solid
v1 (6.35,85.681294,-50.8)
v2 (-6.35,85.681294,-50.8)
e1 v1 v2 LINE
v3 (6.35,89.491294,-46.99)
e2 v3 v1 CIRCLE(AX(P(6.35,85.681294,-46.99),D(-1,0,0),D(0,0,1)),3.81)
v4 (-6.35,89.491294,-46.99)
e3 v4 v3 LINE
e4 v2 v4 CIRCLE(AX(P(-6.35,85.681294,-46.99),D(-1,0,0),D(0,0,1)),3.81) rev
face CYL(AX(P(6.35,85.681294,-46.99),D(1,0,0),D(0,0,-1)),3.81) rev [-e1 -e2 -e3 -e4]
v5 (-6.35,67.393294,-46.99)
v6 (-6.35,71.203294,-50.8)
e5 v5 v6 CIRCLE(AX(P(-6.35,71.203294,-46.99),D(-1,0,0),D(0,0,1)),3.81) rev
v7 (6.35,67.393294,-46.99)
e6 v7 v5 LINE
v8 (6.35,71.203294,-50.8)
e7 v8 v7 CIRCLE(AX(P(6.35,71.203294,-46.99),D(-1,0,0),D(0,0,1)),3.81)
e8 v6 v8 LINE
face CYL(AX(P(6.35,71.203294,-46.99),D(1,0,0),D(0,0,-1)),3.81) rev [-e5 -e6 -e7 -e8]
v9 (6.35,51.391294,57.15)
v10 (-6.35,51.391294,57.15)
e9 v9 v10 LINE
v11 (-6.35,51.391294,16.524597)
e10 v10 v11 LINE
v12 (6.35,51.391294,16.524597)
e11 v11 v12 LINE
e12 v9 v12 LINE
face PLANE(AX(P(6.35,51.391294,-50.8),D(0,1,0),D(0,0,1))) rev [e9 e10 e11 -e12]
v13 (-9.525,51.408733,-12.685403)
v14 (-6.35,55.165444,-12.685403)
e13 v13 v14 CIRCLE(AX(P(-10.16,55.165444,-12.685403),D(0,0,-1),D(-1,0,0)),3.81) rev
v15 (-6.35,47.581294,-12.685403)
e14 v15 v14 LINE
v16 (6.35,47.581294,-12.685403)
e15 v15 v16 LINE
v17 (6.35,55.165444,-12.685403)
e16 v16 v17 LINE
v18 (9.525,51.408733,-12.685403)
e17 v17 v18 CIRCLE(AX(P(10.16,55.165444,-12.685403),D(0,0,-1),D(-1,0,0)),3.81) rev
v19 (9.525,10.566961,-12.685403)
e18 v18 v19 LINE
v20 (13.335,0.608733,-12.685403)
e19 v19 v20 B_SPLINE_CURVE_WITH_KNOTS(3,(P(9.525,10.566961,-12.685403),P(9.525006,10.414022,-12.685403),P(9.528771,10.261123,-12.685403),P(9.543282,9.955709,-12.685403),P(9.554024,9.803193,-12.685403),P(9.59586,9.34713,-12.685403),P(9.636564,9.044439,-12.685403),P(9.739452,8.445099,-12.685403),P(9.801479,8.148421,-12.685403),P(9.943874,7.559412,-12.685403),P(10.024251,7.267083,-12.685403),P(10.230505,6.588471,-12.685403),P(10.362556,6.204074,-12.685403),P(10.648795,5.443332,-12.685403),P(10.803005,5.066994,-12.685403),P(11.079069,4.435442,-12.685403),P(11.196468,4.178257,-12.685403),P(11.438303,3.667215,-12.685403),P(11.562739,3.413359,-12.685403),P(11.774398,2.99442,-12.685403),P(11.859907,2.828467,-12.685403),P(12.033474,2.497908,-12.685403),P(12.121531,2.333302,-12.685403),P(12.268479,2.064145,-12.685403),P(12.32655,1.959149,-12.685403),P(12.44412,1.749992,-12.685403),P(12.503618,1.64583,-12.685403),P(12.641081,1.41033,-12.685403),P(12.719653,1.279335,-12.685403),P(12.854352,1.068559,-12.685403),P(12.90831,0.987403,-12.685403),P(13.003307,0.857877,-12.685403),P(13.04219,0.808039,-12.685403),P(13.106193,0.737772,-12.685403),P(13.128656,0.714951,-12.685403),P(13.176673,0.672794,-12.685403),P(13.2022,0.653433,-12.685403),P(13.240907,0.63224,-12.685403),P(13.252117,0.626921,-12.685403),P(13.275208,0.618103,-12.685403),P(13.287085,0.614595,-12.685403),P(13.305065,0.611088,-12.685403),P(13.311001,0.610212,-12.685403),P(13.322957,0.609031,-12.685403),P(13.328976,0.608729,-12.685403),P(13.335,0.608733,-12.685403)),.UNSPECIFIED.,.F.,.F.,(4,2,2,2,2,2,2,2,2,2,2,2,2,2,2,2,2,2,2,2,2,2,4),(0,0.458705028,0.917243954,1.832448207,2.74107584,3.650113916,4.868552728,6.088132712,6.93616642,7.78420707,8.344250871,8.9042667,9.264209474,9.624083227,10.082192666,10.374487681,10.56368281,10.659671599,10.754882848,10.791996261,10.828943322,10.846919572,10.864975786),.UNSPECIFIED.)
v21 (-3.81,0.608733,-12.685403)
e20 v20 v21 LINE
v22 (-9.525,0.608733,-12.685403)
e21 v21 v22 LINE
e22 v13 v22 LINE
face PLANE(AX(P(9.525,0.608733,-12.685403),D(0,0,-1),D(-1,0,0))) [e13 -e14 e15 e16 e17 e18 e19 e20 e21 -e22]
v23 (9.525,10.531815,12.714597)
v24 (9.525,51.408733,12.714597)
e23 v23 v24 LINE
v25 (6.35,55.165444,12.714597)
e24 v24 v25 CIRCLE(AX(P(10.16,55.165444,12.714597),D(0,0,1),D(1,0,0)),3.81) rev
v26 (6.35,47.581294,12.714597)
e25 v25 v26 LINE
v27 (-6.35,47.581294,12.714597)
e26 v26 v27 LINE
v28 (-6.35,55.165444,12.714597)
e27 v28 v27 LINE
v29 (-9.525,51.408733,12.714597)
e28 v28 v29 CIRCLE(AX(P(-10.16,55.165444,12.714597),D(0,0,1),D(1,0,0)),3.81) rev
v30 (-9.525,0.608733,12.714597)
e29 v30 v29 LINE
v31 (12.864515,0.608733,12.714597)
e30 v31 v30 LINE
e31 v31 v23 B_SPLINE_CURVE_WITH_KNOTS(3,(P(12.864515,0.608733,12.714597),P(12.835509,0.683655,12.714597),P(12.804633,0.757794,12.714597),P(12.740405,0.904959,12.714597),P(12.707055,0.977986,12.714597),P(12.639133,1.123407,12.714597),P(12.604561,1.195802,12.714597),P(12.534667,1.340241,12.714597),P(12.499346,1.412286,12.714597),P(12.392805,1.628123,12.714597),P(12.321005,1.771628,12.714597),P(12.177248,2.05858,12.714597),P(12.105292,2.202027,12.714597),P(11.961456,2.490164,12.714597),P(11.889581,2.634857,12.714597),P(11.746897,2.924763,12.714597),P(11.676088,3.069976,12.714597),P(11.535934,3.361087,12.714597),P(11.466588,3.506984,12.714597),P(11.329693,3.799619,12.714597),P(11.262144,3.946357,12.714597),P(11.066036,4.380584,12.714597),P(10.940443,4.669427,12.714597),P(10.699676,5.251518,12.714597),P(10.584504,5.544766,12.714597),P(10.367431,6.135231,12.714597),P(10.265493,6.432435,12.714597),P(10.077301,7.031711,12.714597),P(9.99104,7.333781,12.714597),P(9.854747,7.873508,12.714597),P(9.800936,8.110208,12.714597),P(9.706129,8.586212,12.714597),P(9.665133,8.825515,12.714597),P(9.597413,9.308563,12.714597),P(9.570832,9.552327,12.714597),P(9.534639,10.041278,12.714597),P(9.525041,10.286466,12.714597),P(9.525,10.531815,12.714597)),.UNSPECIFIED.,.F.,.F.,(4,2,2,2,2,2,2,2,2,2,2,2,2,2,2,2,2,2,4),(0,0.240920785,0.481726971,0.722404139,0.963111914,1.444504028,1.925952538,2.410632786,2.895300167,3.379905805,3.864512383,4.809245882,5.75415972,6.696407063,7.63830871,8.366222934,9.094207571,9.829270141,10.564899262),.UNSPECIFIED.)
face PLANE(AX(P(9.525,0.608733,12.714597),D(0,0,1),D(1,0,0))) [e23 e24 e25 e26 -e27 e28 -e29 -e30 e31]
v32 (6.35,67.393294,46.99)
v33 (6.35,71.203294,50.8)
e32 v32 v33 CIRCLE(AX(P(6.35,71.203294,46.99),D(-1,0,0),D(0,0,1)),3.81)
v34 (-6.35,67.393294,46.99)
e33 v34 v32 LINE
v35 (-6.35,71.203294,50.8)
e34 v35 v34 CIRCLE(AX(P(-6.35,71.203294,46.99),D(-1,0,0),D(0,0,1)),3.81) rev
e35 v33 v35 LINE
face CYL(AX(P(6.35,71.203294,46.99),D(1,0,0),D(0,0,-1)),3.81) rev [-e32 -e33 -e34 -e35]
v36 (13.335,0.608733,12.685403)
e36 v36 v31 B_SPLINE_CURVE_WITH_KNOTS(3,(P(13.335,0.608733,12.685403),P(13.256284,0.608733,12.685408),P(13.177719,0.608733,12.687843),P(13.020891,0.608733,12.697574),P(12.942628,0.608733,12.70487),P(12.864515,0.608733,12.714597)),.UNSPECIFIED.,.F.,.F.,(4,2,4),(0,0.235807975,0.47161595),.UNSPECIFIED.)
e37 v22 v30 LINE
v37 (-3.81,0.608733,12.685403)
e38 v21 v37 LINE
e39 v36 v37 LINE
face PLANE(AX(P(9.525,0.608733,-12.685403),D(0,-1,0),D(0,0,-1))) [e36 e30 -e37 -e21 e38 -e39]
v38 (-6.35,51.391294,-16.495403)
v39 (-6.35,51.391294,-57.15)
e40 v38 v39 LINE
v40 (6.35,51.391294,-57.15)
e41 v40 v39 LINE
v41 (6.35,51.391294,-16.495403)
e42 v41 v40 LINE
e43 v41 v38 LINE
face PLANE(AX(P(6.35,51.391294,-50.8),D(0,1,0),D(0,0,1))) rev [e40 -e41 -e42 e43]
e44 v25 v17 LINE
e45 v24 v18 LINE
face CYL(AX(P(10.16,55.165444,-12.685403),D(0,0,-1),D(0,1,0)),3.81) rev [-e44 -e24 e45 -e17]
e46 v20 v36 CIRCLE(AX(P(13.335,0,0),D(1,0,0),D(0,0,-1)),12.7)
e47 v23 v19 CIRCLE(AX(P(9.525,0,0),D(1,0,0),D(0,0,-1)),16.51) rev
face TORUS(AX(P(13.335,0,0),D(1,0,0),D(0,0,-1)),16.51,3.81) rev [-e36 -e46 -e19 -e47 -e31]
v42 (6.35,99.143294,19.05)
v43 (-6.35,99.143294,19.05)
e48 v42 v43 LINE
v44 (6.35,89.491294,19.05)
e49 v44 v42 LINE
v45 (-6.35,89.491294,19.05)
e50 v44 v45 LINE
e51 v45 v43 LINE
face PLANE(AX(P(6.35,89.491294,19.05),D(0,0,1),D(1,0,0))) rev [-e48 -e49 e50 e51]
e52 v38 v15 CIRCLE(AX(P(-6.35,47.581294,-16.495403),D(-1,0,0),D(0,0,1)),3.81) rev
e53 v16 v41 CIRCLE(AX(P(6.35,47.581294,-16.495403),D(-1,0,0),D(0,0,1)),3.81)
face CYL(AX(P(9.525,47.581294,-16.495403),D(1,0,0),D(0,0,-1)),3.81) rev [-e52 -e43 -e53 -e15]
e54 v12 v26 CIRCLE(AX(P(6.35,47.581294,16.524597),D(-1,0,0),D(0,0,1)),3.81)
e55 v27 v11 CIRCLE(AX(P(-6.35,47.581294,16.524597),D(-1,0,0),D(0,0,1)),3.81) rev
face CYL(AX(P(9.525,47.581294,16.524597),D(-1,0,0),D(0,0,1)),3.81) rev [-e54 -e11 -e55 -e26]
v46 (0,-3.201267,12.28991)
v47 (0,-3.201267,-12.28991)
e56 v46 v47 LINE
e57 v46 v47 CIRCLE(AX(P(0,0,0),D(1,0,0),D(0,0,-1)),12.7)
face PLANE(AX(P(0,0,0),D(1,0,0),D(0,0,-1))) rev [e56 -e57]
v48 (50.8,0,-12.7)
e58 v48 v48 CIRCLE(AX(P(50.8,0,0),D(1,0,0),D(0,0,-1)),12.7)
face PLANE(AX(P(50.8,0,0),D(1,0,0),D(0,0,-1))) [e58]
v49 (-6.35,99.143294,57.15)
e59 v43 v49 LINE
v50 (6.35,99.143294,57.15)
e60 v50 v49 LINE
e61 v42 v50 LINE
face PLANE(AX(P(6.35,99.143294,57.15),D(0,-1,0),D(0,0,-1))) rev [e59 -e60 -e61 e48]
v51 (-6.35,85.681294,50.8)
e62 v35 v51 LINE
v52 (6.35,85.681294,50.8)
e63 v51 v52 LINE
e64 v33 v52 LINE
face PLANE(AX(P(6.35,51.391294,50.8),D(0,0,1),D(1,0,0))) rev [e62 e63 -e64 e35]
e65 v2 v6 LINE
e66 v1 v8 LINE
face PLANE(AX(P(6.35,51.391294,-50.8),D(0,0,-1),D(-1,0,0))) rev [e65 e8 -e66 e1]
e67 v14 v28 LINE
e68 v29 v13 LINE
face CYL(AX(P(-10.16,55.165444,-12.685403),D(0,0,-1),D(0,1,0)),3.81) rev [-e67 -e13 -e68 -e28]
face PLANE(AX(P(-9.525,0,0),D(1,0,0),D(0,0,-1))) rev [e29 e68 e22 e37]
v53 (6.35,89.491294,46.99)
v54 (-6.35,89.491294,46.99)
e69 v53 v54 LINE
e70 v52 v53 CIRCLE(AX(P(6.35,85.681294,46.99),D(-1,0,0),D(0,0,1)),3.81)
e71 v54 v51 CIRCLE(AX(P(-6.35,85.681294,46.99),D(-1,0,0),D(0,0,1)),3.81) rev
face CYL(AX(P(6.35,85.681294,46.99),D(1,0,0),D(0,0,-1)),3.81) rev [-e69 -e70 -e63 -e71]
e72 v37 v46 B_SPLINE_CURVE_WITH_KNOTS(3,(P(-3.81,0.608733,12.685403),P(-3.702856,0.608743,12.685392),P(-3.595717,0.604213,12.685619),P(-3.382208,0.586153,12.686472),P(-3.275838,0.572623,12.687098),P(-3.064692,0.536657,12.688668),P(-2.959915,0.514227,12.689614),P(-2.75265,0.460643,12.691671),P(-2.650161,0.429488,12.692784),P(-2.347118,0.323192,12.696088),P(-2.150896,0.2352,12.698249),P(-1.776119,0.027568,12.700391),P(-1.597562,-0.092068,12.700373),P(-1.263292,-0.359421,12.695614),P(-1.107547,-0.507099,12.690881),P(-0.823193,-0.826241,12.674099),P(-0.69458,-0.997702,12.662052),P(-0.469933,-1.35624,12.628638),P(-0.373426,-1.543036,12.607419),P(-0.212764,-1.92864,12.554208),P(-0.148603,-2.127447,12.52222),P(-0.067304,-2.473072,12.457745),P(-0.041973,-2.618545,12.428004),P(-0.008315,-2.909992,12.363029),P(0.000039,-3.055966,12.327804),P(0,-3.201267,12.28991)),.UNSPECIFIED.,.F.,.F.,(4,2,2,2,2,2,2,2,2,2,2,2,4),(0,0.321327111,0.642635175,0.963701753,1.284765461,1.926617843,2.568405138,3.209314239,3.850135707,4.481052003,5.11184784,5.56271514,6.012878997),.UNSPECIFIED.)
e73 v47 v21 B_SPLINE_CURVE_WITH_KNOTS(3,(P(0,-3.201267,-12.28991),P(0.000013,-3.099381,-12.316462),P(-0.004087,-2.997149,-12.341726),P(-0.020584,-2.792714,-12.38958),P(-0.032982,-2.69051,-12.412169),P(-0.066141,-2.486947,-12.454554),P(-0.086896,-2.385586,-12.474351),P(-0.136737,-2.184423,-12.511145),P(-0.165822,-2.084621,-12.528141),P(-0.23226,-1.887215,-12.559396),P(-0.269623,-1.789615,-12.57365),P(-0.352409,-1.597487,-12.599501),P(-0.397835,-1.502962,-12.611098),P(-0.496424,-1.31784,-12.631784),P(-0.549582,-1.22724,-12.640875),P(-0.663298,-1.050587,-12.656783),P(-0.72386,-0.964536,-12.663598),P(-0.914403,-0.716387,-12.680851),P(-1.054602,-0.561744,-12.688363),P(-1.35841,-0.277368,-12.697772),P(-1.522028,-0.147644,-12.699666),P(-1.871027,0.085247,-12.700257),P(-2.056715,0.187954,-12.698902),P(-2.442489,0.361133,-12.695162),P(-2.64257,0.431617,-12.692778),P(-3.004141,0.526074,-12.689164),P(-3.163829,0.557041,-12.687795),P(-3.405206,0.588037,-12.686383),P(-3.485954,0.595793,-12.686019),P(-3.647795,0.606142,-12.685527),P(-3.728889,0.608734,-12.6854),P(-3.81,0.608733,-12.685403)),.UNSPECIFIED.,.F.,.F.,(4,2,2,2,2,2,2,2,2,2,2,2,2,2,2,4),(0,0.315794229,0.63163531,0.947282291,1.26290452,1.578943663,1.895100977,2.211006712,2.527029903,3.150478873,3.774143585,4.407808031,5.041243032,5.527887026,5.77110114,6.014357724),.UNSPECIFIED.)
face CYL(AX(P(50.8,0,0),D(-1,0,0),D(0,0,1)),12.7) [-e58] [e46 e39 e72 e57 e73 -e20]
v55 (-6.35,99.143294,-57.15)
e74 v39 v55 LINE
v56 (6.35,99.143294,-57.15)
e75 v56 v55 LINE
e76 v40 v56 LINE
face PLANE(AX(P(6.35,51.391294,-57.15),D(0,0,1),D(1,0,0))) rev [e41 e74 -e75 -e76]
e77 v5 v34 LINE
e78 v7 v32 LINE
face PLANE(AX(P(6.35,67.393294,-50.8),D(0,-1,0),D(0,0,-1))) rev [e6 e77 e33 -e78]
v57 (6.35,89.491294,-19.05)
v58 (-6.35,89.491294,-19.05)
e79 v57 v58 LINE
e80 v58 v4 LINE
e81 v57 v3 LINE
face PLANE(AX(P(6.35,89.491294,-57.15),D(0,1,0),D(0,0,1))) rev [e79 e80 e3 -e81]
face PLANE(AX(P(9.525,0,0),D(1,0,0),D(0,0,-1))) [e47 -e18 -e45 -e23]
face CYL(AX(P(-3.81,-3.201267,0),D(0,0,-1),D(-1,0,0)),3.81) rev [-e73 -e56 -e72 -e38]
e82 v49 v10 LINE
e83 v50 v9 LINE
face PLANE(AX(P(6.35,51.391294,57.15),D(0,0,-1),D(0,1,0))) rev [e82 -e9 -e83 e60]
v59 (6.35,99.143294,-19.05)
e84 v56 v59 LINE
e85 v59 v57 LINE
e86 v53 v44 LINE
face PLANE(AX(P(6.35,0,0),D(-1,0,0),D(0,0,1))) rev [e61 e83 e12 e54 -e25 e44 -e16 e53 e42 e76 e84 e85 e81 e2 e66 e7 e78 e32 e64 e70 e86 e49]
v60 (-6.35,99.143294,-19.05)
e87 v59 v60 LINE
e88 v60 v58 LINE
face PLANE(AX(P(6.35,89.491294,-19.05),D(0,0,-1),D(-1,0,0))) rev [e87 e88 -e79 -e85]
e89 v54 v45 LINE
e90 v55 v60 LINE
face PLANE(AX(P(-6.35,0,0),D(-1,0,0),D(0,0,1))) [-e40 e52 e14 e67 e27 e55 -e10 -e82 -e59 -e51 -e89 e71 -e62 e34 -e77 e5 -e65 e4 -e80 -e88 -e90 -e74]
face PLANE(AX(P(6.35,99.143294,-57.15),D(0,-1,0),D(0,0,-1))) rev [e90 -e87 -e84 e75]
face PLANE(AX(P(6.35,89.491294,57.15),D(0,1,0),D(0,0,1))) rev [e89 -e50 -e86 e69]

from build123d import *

# Parameters (mm, degrees)
SKETCH2_R           = 12.7
BOSS_EXTRUDE1_DEPTH = 50.8
SKETCH3_W           = 25.4
SKETCH3_H           = 50.8
BOSS_EXTRUDE2_DEPTH = 9.525
SKETCH5_W           = 101.6
SKETCH5_H           = 16.002
BOSS_EXTRUDE3_DEPTH = 6.35
SKETCH6_W           = 6.35
SKETCH6_H           = 38.1
BOSS_EXTRUDE4_DEPTH = 6.35
SKETCH7_W           = 38.1
SKETCH7_H           = 9.652
BOSS_EXTRUDE5_DEPTH = 6.35
FILLET1_R           = 3.81
FILLET2_R           = 3.81


with BuildPart() as part:
    # Sketch2 → Boss-Extrude1 (new body)
    with BuildSketch(Plane(origin=(0, 0, 0), x_dir=(0, 0, -1), z_dir=(1, 0, 0))):
        Circle(SKETCH2_R)
    extrude(amount=BOSS_EXTRUDE1_DEPTH)

    # Sketch3 → Boss-Extrude2 (add, symmetric)
    with BuildSketch(Plane.ZY):
        with Locations((0.014597196, 26.008732875)):
            Rectangle(SKETCH3_W, SKETCH3_H)
    extrude(amount=BOSS_EXTRUDE2_DEPTH, both=True)


with BuildPart() as body_2:
    # Sketch5 → Boss-Extrude3 (new, symmetric)
    with BuildSketch(Plane(origin=(0, 0, 0), x_dir=(0, 0, -1), z_dir=(1, 0, 0))):
        with Locations((0, 59.392294155)):
            Rectangle(SKETCH5_W, SKETCH5_H)
    extrude(amount=BOSS_EXTRUDE3_DEPTH, both=True)

    # Sketch6 → Boss-Extrude4 (add, symmetric)
    with BuildSketch(Plane(origin=(0, 0, 0), x_dir=(0, 0, -1), z_dir=(1, 0, 0))):
        with Locations((-53.975, 70.441294155)):
            Rectangle(SKETCH6_W, SKETCH6_H)
        with Locations((53.975, 70.441294155)):
            Rectangle(SKETCH6_W, SKETCH6_H)
    extrude(amount=BOSS_EXTRUDE4_DEPTH, both=True)

    # Sketch7 → Boss-Extrude5 (add, symmetric)
    with BuildSketch(Plane(origin=(0, 0, 0), x_dir=(0, 0, -1), z_dir=(1, 0, 0))):
        with Locations((-38.1, 94.317294155)):
            Rectangle(SKETCH7_W, SKETCH7_H)
        with Locations((38.1, 94.317294155)):
            Rectangle(SKETCH7_W, SKETCH7_H)
    extrude(amount=BOSS_EXTRUDE5_DEPTH, both=True)


with BuildPart() as part_1:
    add(part.part)

    # Combine1: union body 2
    add(body_2.part)

    # Fillet1
    # the kernel refuses this fillet: 3.81 mm, written as the material it adds along each edge
    with BuildSketch(Plane(origin=(-6.35, 51.391294155, 12.714597196), x_dir=(0, -1, 0), z_dir=(1, 0, 0)), Plane(origin=(6.35, 51.391294155, -12.685402804), x_dir=(0, -1, 0), z_dir=(-1, 0, 0)), Plane(origin=(6.35, 67.393294155, -50.8), x_dir=(0, 1, 0), z_dir=(-1, 0, 0)), Plane(origin=(-6.35, 89.491294155, 50.8), x_dir=(0, 0, -1), z_dir=(1, 0, 0)), Plane(origin=(-6.35, 67.393294155, 50.8), x_dir=(0, 1, 0), z_dir=(1, 0, 0))) as fillet1_piece_1:
        with BuildLine():
            CenterArc((FILLET1_R, -FILLET1_R), FILLET1_R, 90, 90)
            Line((0, -FILLET1_R), (0, 0))
            Line((0, 0), (FILLET1_R, 0))
        make_face()
    extrude(amount=12.7)
    with BuildSketch(Plane(origin=(9.525, 0, 0), x_dir=(0, -0.6466492608489325, 0.762787475935158), z_dir=(0, -0.762787475935158, -0.6466492608489325))) as fillet1_piece_2_section:
        with BuildLine():
            CenterArc((12.7 + FILLET1_R, -FILLET1_R), FILLET1_R, 90, 90)
            Line((12.7 + FILLET1_R, 0), (12.7, 0))
            Line((12.7, 0), (12.7, -FILLET1_R))
        make_face()
    fillet1_piece_2 = revolve(axis=Axis((9.525, 0, 0), (-1, 0, 0)), revolution_arc=260.578888602, mode=Mode.PRIVATE)
    fillet1_piece_2 = split(fillet1_piece_2, bisect_by=Plane(origin=(10.607555303, 13.782555283, -12.685402804), z_dir=(0, 0, 1)), keep=Keep.TOP, mode=Mode.PRIVATE)
    fillet1_piece_2 = split(fillet1_piece_2, bisect_by=Plane(origin=(10.607555303, 0.608732875, 0.000757571), z_dir=(0, 1, 0)), keep=Keep.TOP, mode=Mode.PRIVATE)
    fillet1_piece_2 = split(fillet1_piece_2, bisect_by=Plane(origin=(10.607555303, 13.782555283, 12.714597196), z_dir=(0, 0, -1)), keep=Keep.TOP, mode=Mode.PRIVATE)
    add(fillet1_piece_2)
    with BuildSketch(Plane(origin=(6.35, 89.491294155, -50.8), x_dir=(0, -1, 0), z_dir=(-1, 0, 0))) as fillet1_piece_3:
        with BuildLine():
            CenterArc((FILLET1_R, FILLET1_R), FILLET1_R, 180, 90)
            Line((0, FILLET1_R), (0, 0))
            Line((0, 0), (FILLET1_R, 0))
        make_face()
    extrude(amount=12.7)

    # Fillet2
    # the kernel refuses this fillet: 3.81 mm, written as the material it adds along each edge
    with BuildSketch(Plane(origin=(0, 0.608732875, 22.210402804), x_dir=(-1, 0, 0), z_dir=(0, 0, -1))) as fillet2_piece_1_section:
        with BuildLine():
            CenterArc((FILLET2_R, -FILLET2_R), FILLET2_R, 90, 90)
            Line((0, -FILLET2_R), (0, 0))
            Line((0, 0), (FILLET2_R, 0))
        make_face()
    fillet2_piece_1 = extrude(amount=44.420805607, mode=Mode.PRIVATE)
    fillet2_piece_1 = fillet2_piece_1 & Plane(origin=(-0.851863451, 0, 0), x_dir=(0, 0, -1), z_dir=(-1, 0, 0)) * Cylinder(12.7, 105, mode=Mode.PRIVATE)
    add(fillet2_piece_1)
    with BuildSketch(Plane(origin=(-6.35, 51.408732875, 12.714597196), x_dir=(0, 1, 0), z_dir=(0, 0, -1))) as fillet2_piece_2:
        with BuildLine():
            CenterArc((3.756710662, -3.81), FILLET2_R, 90, 80.405931773)
            Line((0, -3.175), (0, 0))
            Line((0, 0), (3.756710662, 0))
        make_face()
    extrude(amount=25.4)
    with BuildSketch(Plane(origin=(6.35, 51.408732875, 12.714597196), x_dir=(0, 1, 0), z_dir=(0, 0, -1))) as fillet2_piece_3:
        with BuildLine():
            CenterArc((3.756710662, 3.81), FILLET2_R, 189.594068227, 80.405931773)
            Line((0, 3.175), (0, 0))
            Line((0, 0), (3.756710662, 0))
        make_face()
    extrude(amount=25.4)


solid = part_1.part
